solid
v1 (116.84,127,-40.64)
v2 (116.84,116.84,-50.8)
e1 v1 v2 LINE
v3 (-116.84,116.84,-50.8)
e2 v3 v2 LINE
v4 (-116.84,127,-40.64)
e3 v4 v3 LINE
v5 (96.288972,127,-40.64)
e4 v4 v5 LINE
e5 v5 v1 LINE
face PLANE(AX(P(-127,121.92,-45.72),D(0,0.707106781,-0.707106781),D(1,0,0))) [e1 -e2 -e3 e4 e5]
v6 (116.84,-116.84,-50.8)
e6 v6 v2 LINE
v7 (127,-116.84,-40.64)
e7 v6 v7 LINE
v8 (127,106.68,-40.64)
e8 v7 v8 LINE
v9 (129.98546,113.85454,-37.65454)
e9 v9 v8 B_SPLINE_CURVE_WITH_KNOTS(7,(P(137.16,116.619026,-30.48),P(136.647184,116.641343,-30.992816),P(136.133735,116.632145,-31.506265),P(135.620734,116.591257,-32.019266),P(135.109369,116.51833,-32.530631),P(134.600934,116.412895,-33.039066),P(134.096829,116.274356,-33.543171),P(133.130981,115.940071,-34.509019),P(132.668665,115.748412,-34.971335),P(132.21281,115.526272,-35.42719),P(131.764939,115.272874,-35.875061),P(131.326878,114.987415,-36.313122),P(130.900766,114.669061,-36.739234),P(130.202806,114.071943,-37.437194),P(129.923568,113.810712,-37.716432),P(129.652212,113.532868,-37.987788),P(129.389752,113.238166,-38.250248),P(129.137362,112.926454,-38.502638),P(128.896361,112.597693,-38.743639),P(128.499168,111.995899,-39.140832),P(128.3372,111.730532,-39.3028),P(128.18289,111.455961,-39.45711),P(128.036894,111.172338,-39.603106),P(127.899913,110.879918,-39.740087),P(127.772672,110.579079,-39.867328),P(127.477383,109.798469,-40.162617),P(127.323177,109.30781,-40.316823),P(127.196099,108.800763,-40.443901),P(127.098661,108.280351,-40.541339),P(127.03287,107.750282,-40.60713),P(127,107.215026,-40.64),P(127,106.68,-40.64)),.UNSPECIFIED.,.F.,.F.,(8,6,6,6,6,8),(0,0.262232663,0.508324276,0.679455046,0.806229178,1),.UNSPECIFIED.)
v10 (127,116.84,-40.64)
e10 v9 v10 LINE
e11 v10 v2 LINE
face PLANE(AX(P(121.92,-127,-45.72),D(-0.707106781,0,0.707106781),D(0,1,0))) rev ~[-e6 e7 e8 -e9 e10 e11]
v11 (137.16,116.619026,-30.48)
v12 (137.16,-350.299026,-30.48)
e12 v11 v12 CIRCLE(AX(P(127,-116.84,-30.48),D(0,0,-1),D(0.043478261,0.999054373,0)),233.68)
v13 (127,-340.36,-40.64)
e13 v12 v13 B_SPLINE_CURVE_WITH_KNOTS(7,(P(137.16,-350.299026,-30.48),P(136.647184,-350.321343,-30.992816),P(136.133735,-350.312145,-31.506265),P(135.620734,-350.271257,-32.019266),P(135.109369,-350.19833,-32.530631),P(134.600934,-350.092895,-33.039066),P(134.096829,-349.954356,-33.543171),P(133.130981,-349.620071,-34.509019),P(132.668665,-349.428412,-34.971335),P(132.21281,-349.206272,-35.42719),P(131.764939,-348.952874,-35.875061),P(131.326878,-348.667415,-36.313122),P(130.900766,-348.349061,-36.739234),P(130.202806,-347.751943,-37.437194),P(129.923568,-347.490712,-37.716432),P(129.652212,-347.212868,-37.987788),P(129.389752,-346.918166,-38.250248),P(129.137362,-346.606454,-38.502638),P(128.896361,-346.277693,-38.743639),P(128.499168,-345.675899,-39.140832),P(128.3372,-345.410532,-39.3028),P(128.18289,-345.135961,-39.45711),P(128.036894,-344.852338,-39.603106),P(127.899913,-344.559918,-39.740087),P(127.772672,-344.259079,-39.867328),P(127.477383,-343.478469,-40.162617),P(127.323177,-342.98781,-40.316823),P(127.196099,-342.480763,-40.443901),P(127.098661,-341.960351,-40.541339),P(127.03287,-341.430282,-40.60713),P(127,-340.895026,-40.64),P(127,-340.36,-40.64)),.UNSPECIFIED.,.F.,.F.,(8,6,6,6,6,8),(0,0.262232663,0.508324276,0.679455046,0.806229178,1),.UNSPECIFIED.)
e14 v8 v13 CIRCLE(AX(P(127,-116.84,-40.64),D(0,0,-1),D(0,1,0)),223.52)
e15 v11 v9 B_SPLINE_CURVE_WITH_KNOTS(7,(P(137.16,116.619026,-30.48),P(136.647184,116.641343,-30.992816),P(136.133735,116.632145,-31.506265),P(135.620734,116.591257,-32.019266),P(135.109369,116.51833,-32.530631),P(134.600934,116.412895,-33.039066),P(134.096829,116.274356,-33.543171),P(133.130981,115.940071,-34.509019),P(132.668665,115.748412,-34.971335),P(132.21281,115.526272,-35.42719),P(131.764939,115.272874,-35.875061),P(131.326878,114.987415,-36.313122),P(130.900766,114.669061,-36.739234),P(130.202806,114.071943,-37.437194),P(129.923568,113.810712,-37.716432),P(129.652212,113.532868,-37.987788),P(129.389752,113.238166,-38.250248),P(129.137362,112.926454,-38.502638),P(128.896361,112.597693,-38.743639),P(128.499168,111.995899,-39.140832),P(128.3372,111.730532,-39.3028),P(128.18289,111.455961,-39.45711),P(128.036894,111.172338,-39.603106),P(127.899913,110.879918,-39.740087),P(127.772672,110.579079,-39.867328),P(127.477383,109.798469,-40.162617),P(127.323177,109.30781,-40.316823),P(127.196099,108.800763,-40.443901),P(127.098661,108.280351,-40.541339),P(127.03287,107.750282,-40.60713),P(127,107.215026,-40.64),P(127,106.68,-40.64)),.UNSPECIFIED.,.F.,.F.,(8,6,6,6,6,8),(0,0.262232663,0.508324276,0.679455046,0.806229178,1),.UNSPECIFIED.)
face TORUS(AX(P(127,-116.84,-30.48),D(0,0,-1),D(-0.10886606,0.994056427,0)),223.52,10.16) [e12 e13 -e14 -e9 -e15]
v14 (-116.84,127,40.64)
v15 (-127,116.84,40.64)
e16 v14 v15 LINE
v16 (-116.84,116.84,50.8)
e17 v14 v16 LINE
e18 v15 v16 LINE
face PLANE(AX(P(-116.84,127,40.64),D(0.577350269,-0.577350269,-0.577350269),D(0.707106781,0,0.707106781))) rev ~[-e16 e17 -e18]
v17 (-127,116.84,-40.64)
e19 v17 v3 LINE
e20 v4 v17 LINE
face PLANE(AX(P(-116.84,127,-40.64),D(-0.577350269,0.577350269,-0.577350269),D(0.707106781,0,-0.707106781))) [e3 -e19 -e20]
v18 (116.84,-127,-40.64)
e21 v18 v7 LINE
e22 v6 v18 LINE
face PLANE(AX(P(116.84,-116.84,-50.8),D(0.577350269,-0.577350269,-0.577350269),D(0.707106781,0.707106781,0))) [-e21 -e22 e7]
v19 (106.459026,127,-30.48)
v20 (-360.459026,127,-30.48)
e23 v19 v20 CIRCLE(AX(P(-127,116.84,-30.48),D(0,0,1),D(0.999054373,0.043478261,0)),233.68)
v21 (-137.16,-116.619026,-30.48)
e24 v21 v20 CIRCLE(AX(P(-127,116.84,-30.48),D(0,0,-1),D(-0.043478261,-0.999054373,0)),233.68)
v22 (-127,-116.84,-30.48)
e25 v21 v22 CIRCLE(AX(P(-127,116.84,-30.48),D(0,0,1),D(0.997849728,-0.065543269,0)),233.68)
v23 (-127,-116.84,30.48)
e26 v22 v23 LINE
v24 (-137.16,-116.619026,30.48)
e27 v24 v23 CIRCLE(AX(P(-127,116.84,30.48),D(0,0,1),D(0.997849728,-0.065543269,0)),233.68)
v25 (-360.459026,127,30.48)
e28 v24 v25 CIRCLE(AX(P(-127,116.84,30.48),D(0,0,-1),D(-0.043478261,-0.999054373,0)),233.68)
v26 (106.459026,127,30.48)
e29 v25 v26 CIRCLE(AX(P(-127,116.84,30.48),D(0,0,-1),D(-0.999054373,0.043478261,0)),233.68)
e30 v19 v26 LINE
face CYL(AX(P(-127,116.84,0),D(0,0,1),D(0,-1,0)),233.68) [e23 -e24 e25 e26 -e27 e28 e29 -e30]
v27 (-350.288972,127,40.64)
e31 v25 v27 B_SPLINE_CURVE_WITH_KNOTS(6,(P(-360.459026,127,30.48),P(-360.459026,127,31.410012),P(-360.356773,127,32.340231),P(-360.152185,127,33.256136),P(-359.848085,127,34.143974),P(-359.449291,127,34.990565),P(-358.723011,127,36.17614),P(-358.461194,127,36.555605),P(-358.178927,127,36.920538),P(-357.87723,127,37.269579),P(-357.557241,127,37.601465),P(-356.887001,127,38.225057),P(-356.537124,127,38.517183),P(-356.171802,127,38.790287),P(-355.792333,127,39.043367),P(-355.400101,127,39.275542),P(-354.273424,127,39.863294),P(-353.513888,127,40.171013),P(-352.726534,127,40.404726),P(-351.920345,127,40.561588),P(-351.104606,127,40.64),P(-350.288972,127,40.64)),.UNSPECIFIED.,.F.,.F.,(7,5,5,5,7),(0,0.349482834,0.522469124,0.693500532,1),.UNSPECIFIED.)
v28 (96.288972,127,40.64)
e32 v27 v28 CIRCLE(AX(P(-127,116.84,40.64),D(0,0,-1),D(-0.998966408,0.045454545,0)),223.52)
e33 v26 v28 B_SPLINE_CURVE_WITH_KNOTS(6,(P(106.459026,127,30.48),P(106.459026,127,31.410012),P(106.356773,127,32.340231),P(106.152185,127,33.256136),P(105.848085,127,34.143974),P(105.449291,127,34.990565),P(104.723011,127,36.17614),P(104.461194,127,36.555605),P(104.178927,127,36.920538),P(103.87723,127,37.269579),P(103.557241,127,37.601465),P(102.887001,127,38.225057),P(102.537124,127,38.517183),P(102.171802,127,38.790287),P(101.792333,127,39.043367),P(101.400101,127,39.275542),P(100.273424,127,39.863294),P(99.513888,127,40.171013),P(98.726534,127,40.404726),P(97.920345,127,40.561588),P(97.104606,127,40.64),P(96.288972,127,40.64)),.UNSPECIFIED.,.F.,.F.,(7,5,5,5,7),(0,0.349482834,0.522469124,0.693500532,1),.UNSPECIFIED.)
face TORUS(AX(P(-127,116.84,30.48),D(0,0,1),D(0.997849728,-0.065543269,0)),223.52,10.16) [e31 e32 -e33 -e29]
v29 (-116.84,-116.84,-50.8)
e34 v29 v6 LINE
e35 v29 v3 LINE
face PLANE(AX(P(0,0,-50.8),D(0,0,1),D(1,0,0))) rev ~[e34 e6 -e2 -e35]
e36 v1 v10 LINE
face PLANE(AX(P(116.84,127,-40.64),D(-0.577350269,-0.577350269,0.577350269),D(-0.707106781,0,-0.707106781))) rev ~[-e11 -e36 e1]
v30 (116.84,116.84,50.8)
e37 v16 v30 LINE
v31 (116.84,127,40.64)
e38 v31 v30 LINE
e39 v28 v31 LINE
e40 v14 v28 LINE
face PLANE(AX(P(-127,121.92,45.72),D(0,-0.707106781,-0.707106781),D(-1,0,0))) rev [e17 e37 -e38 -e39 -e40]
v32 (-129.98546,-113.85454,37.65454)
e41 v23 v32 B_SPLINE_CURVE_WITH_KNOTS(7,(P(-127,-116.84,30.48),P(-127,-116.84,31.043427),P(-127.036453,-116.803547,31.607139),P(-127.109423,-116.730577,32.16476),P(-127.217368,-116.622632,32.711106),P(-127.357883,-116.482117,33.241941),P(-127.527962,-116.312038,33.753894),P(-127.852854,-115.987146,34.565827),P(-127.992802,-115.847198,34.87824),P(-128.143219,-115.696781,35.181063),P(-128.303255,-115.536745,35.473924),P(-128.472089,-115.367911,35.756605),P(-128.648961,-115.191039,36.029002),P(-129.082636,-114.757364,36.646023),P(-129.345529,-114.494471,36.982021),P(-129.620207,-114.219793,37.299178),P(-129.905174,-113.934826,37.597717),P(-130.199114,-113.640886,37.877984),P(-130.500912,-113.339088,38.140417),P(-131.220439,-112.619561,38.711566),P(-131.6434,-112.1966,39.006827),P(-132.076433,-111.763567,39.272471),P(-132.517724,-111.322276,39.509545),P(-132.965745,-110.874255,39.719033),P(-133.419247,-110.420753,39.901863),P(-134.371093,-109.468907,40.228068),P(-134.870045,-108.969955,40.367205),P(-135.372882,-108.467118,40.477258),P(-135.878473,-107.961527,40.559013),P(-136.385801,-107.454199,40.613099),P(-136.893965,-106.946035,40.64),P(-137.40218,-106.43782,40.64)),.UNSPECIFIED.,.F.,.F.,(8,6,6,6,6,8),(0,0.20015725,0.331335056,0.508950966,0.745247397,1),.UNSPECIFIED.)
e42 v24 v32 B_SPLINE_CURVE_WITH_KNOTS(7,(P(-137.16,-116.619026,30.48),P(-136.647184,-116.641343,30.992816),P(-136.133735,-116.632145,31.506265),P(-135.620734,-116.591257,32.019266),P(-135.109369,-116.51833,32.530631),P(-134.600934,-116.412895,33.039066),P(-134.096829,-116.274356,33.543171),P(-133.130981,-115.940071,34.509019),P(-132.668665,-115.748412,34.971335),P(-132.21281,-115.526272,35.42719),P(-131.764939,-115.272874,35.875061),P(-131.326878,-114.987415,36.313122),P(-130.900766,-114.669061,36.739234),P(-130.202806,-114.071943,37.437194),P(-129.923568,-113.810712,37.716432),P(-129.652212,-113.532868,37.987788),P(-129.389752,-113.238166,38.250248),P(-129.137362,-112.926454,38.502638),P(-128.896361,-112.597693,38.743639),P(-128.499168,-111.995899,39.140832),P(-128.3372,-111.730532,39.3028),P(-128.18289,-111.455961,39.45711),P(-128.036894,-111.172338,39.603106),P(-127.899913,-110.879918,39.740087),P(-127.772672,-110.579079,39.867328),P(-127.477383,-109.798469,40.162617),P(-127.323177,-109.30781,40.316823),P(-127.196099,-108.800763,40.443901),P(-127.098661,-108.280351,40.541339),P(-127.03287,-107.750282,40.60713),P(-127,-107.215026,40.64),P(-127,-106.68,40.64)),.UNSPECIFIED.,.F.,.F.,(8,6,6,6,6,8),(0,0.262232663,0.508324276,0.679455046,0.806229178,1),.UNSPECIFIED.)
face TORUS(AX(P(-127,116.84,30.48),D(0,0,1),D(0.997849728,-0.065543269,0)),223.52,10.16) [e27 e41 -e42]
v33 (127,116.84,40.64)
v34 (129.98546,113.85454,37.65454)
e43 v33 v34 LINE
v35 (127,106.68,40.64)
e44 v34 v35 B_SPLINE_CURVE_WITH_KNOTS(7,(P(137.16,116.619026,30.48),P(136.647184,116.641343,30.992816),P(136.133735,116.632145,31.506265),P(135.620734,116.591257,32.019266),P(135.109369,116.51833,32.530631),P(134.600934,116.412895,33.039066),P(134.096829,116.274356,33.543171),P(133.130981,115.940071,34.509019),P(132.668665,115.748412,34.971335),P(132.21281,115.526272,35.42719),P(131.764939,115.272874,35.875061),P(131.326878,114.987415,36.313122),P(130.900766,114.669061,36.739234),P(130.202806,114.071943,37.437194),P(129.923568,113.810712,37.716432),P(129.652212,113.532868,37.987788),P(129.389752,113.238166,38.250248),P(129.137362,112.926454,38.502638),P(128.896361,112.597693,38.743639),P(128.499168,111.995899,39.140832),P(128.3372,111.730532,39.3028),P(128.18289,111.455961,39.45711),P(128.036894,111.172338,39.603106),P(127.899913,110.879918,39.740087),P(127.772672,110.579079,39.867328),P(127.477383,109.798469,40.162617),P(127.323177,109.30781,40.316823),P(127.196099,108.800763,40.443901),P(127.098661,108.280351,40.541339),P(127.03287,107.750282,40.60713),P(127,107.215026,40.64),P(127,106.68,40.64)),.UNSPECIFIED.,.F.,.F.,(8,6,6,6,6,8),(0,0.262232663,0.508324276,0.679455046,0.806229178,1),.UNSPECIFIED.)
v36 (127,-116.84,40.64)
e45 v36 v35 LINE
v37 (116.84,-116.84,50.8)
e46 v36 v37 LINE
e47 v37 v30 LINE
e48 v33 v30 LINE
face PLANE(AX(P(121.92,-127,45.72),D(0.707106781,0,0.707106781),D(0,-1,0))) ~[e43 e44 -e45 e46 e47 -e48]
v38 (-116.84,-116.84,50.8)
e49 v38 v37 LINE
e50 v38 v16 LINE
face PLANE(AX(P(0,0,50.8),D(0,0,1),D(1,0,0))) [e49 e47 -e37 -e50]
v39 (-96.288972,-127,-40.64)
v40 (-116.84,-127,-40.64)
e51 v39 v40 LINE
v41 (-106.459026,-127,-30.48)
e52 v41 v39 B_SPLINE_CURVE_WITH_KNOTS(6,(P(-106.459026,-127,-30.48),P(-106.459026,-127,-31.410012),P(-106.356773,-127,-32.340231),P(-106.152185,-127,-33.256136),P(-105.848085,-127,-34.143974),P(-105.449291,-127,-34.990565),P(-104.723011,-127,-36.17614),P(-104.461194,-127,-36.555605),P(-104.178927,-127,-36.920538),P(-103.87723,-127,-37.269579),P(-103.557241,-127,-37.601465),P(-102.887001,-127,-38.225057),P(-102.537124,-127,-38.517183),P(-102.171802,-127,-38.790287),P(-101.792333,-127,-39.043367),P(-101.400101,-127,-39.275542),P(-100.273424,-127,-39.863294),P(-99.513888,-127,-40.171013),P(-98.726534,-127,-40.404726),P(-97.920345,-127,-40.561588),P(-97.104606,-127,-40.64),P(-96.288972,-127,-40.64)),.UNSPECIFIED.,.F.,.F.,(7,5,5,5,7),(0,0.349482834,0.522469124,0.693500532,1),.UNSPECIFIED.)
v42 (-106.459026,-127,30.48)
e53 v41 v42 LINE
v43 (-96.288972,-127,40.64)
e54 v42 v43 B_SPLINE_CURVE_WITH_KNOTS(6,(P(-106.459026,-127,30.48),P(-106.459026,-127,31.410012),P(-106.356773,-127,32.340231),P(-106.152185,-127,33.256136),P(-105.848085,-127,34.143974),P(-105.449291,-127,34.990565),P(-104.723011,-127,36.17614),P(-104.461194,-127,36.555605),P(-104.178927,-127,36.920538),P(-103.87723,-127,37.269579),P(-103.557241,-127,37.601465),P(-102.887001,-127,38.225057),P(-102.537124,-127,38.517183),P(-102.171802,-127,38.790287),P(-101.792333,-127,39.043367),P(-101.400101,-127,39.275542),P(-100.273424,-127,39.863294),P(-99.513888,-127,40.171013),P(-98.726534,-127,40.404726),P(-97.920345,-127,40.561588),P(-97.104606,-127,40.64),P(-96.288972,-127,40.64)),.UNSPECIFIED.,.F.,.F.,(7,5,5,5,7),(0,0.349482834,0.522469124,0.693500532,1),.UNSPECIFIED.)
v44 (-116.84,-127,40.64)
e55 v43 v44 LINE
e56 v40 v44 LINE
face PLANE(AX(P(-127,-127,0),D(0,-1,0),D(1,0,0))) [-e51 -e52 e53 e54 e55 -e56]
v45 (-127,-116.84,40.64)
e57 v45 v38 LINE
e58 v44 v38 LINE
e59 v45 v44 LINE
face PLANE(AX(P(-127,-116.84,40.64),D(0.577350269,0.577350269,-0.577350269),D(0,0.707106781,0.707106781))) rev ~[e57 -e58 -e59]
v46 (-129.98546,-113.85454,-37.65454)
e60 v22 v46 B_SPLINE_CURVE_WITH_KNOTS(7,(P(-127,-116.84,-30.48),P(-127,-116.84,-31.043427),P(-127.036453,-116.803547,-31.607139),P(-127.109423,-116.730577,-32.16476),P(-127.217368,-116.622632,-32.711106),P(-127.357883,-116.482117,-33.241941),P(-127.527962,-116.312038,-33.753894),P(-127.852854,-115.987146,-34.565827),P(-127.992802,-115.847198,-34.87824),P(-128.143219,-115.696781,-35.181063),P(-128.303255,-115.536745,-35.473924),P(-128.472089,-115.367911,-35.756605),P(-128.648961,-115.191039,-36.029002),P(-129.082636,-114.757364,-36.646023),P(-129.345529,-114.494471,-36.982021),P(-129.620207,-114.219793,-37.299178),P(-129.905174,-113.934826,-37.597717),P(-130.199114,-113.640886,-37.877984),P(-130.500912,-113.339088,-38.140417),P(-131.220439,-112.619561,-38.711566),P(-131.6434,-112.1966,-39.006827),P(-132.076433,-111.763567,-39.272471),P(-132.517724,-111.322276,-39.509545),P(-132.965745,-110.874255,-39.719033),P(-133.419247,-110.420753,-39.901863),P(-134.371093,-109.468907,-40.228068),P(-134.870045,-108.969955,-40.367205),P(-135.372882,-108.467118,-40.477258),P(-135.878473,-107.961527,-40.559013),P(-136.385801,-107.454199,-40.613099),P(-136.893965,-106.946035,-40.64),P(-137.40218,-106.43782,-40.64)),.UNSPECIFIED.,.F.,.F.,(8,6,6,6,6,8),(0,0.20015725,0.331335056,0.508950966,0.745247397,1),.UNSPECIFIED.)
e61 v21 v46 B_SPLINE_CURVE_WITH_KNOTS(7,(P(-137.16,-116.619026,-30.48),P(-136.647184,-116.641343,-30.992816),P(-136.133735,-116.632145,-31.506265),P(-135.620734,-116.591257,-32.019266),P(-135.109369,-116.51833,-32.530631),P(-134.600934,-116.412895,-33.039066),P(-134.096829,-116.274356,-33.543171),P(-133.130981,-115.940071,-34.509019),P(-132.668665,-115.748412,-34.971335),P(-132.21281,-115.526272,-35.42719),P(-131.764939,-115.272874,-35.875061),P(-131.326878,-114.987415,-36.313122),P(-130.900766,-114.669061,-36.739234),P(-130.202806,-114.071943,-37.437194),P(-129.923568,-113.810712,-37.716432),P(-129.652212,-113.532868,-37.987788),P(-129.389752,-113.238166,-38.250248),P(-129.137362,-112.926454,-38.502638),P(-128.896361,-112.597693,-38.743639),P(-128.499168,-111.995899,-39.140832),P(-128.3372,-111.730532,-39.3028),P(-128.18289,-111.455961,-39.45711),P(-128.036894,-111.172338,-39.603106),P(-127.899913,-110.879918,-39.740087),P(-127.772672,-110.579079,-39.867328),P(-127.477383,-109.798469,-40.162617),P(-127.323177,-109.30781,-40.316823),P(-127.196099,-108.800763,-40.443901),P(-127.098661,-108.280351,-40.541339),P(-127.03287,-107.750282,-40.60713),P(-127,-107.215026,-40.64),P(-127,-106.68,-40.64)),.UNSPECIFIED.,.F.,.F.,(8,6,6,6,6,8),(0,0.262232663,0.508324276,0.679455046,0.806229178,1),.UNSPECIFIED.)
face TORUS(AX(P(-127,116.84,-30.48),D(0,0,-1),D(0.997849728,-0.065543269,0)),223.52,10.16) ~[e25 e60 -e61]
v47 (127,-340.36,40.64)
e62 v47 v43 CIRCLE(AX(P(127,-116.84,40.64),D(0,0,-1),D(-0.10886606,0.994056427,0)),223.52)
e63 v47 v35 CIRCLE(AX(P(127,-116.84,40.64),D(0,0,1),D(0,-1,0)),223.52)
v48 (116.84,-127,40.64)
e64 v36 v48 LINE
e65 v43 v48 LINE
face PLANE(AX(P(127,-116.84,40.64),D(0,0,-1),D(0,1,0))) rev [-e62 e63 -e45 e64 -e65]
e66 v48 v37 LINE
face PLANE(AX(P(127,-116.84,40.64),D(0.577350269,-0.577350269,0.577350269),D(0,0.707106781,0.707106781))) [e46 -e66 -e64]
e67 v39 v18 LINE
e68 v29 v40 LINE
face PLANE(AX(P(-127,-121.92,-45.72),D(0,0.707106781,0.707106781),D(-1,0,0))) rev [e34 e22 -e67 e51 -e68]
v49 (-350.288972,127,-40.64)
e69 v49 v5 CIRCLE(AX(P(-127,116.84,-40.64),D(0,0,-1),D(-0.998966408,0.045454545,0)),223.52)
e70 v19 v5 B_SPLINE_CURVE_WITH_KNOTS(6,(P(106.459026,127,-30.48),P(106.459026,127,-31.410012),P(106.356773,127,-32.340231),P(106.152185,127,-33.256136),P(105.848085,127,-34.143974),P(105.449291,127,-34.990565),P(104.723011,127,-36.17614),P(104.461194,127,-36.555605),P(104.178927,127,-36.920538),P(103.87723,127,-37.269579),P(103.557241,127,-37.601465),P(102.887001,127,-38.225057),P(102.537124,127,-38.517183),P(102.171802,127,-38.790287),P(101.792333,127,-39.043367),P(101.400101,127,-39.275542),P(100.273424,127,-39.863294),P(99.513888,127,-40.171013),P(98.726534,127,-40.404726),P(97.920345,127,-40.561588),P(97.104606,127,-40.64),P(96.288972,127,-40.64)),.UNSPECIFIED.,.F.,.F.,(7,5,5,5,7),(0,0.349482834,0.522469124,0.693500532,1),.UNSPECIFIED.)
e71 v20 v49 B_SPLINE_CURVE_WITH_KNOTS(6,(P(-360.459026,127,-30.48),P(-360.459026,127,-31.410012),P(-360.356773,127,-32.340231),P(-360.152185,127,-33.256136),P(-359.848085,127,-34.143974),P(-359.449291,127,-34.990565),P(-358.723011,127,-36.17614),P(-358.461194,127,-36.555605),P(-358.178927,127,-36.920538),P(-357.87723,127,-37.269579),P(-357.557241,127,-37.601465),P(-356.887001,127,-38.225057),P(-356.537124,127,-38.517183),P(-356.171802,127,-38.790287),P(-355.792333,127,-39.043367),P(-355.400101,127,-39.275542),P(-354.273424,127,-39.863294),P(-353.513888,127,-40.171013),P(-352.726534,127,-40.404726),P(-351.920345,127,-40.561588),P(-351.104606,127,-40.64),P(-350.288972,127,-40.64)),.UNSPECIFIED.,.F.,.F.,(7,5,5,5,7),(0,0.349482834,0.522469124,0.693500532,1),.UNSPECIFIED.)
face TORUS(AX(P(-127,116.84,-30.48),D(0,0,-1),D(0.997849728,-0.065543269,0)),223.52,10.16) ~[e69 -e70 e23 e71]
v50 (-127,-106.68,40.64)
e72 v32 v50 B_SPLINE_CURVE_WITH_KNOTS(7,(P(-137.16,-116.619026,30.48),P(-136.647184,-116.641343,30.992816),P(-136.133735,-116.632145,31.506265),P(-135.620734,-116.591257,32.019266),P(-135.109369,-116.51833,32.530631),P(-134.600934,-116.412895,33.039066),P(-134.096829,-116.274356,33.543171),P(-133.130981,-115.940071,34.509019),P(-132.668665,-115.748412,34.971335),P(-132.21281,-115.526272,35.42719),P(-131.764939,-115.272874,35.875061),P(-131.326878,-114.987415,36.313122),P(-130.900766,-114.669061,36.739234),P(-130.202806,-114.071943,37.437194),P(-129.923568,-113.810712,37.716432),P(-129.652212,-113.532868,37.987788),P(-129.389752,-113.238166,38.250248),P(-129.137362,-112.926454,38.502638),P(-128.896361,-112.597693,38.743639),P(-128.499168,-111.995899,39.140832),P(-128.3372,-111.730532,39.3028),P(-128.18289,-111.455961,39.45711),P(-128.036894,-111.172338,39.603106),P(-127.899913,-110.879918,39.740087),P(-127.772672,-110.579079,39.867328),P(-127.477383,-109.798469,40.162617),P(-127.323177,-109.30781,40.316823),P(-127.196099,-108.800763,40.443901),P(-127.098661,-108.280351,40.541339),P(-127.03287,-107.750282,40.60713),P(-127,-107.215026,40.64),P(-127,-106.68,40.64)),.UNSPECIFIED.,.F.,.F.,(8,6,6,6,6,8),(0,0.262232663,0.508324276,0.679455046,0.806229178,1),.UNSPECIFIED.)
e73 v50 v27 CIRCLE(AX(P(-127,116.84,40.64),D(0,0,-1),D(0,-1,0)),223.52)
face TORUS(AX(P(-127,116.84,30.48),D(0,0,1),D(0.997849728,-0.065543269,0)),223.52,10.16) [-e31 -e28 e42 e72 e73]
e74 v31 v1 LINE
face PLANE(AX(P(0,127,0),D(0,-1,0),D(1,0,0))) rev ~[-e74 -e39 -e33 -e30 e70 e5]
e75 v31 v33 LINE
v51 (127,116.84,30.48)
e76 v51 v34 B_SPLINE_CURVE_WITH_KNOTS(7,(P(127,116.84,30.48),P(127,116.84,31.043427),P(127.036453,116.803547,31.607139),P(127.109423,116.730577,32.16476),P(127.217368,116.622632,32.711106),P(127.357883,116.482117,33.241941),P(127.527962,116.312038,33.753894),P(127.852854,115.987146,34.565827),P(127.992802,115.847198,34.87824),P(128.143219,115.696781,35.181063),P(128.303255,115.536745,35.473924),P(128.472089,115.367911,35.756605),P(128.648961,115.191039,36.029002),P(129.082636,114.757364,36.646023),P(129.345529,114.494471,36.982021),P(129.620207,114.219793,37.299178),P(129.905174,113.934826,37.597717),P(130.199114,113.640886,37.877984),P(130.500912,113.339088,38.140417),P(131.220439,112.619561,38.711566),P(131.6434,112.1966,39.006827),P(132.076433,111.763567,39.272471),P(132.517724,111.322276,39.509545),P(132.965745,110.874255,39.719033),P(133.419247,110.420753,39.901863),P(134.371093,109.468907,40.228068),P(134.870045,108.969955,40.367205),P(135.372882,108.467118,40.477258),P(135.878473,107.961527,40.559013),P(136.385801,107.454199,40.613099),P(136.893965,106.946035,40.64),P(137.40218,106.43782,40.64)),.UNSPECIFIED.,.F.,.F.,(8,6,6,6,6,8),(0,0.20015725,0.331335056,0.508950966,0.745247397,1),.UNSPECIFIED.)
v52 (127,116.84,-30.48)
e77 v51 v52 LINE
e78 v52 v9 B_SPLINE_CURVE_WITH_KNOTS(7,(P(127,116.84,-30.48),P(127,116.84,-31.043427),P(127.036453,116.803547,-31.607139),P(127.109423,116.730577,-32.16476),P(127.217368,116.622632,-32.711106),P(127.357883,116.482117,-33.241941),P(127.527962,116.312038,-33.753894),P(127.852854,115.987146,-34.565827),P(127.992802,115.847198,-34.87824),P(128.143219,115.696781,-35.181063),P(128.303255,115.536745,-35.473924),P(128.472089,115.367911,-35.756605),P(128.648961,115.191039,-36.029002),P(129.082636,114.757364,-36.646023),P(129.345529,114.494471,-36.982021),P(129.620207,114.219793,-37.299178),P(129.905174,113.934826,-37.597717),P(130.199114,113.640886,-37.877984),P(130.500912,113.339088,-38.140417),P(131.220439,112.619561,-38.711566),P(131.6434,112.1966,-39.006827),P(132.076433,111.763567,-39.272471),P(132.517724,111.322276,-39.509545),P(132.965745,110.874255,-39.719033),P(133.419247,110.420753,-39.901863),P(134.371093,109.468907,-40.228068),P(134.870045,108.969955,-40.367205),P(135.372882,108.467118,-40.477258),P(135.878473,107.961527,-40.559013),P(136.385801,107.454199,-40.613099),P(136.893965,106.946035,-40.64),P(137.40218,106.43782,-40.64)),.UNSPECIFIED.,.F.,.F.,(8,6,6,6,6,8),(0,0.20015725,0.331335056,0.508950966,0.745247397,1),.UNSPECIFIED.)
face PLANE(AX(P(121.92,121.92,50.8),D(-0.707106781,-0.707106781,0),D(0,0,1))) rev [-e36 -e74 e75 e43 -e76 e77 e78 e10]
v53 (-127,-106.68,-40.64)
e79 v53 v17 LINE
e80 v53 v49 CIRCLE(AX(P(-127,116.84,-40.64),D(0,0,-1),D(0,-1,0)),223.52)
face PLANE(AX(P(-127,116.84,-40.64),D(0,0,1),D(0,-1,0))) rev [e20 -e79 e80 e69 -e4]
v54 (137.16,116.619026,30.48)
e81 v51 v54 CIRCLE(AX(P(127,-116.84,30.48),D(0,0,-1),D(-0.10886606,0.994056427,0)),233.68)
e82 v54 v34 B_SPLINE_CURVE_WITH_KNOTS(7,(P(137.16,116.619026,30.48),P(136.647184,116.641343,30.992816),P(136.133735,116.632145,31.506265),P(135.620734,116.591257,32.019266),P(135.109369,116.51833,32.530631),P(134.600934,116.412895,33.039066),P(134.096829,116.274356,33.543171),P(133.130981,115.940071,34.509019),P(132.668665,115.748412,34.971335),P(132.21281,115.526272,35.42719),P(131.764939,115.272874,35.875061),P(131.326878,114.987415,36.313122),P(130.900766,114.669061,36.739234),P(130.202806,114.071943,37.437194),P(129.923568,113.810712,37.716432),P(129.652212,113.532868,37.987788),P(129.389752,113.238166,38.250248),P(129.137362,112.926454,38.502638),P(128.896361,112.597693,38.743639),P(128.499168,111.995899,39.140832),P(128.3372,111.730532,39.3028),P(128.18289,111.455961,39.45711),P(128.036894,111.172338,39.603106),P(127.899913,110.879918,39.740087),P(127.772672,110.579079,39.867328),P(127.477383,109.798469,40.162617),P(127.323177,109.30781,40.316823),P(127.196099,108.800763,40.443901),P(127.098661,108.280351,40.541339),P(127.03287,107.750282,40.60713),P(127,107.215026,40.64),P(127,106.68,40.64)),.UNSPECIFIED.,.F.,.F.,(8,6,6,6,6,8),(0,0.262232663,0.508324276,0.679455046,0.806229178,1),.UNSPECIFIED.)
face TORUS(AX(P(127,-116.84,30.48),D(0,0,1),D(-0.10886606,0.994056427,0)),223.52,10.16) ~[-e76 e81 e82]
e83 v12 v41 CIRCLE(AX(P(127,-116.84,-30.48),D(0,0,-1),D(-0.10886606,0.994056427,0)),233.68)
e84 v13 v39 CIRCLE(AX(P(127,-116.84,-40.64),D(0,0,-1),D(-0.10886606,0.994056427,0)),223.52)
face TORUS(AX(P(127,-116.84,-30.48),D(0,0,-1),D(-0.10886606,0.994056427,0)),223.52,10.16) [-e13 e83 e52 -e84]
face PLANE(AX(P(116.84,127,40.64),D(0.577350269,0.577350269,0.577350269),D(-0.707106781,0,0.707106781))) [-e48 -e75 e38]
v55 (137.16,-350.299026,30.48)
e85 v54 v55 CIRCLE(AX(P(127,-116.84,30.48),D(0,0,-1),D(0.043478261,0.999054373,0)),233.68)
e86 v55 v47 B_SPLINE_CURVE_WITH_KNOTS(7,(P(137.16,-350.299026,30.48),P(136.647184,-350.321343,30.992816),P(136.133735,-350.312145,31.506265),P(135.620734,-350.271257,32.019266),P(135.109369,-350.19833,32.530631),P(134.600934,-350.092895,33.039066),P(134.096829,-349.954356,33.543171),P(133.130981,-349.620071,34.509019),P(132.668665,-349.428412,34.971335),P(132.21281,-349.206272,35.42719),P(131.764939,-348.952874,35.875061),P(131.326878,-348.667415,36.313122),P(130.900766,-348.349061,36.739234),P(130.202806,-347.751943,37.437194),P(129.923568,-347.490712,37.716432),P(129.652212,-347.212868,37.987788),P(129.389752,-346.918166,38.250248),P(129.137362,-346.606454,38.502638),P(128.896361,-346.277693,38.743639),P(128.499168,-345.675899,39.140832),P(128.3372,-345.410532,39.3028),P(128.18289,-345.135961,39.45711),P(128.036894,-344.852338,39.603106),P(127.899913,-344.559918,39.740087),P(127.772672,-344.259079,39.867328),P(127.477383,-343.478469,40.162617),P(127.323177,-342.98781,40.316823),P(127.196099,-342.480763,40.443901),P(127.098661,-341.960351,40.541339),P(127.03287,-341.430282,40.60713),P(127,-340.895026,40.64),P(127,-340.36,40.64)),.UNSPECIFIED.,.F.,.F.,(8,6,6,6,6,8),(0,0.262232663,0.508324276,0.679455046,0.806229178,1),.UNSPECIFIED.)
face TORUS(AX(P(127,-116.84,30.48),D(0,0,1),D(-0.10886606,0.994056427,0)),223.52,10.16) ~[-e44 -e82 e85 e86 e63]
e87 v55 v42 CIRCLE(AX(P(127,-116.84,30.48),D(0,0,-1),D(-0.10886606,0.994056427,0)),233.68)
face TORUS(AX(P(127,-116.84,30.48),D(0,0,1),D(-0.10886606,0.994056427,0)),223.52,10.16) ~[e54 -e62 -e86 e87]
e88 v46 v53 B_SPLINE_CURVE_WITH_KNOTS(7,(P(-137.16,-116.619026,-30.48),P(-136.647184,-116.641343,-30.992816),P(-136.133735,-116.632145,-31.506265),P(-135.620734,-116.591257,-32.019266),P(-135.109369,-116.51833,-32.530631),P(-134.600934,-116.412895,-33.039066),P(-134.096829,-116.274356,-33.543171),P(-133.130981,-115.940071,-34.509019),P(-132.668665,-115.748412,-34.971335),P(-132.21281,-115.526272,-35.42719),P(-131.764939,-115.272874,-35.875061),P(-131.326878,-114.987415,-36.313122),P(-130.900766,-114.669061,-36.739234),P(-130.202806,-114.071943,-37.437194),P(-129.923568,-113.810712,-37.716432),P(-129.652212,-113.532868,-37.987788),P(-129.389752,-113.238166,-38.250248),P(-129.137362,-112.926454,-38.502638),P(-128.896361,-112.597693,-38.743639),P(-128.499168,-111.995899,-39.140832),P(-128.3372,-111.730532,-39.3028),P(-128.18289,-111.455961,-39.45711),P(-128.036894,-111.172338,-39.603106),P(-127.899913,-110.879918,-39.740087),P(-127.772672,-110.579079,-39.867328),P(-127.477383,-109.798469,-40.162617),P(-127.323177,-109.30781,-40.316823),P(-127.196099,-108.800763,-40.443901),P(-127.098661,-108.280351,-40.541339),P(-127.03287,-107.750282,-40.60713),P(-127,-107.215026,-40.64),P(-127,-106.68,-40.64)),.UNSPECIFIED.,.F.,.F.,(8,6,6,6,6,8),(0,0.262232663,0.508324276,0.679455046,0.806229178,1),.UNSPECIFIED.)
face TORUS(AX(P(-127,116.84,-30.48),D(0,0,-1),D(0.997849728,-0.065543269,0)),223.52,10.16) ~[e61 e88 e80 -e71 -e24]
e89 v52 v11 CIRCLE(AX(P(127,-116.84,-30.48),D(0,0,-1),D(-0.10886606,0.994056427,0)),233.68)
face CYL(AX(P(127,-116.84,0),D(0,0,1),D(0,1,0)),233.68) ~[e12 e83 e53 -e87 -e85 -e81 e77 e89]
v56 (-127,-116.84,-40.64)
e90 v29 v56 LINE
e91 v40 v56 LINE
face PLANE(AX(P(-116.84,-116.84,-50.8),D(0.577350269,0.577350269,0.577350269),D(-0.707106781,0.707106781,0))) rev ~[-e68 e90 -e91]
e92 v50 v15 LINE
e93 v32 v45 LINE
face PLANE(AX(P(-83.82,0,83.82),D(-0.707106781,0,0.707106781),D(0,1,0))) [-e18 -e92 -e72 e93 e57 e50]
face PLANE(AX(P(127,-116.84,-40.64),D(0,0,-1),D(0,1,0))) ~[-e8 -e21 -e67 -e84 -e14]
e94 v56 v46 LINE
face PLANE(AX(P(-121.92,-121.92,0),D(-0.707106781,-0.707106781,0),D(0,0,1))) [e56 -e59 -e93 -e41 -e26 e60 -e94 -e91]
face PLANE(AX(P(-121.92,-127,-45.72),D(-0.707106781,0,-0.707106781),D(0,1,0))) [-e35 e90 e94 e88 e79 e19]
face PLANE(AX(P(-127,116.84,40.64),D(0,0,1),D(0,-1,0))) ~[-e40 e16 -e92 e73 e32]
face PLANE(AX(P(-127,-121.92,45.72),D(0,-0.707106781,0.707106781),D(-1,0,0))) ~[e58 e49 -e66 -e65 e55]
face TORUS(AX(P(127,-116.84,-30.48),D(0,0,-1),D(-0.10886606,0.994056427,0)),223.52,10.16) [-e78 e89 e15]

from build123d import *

# Parameters (mm, degrees)
F0_W          = 254
F0_H          = 254
F1_DEPTH      = 50.8
F1_DEPTH_BACK = 50.8
F2_SIZE       = 10.16
F1_FACE_W     = 233.68
F1_FACE_H     = 81.28
F1_FACE1_W    = 233.68
F1_FACE1_H    = 81.28
F5_T4_ANGLE   = 280.0079997231
F5_T9_ANGLE   = 280.0079997231
F5_T14_ANGLE  = 280.0079997231
F5_T19_ANGLE  = 280.0079997231
F5_T24_ANGLE  = 280.0079997231
F5_T29_ANGLE  = 280.0079997231
F5_T34_ANGLE  = 280.0079997231
F5_T39_ANGLE  = 280.0079997231
F5_T44_ANGLE  = 280.0079997231
F5_T49_ANGLE  = 280.0079997231
F5_T54_ANGLE  = 280.0079997231
F5_T59_ANGLE  = 280.0079997231


# Not quite as in the source:
# - a fillet or chamfer that OpenCascade refuses, or shapes differently, is made with other operations: its cross-section is extruded or revolved along the edge and cut away or added


with BuildPart() as f1:
    # F0 (on Top) → F1 (new body, two sides)
    with BuildSketch(Plane.XY) as f1_sk:
        Rectangle(F0_W, F0_H)
    extrude(amount=F1_DEPTH)
    extrude(f1_sk.sketch, amount=-F1_DEPTH_BACK)

    # F2
    f2_edges = [f1.edges().sort_by_distance(p)[0] for p in [
        (0, -127, 50.8),
        (127, -127, 0),
        (127, 0, 50.8),
        (-127, -127, 0),
        (0, -127, -50.8),
        (127, 0, -50.8),
        (127, 127, 0),
        (-127, 0, 50.8),
        (-127, 0, -50.8),
        (-127, 127, 0),
        (0, 127, 50.8),
        (0, 127, -50.8),
    ]]
    chamfer(f2_edges, length=F2_SIZE)

    # F1_face (on face) → F3 (revolve)
    with BuildSketch(Plane.YZ.offset(127)):
        Rectangle(F1_FACE_W, F1_FACE_H)
    revolve(axis=Axis((127, -116.84, 0), (0, 0, -1)))

    # F1_face1 (on face) → F4 (revolve)
    with BuildSketch(Plane(origin=(-127, 0, 0), x_dir=(0, -1, 0), z_dir=(-1, 0, 0))):
        Rectangle(F1_FACE1_W, F1_FACE1_H)
    revolve(axis=Axis((-127, 116.84, 0), (0, 0, 1)))

    # F5: fillet of radius 10.16 on 4 edges, made by hand


with BuildPart() as f5_tool2:
    # F5_s3 → F5_t4 (revolve)
    with BuildSketch(Plane(origin=(112.850510213, 12.3590473355, 0), x_dir=(0, 0, 1), z_dir=(-0.9940564274, -0.1088660602, 0))):
        with BuildLine():
            ThreePointArc((30.48, 103.70845737), (37.6642048969, 100.7326622668), (40.64, 93.54845737))
            Line((40.64, 93.54845737), (40.64, 103.70845737))
            Line((40.64, 103.70845737), (30.48, 103.70845737))
        make_face()
    revolve(axis=Axis((127, -116.84, 40.64), (0, 0, -1)), revolution_arc=F5_T4_ANGLE)

    split(bisect_by=Plane(origin=(83.82, 0, 83.82), x_dir=(0, 1, 0), z_dir=(0.7071067812, 0, 0.7071067812)), keep=Keep.TOP)


with BuildPart() as f1_1:
    add(f1.part)

    # F5_t1: cut F5_tool2
    add(f5_tool2.part, mode=Mode.SUBTRACT)


with BuildPart() as f5_tool7:
    # F5_s8 → F5_t9 (revolve)
    with BuildSketch(Plane(origin=(112.850510213, 12.3590473355, 0), x_dir=(0, 0, 1), z_dir=(-0.9940564274, -0.1088660602, 0))):
        with BuildLine():
            ThreePointArc((30.48, 103.70845737), (37.6642048969, 100.7326622668), (40.64, 93.54845737))
            Line((40.64, 93.54845737), (40.64, 103.70845737))
            Line((40.64, 103.70845737), (30.48, 103.70845737))
        make_face()
    revolve(axis=Axis((127, -116.84, 40.64), (0, 0, -1)), revolution_arc=F5_T9_ANGLE)

    split(bisect_by=Plane(origin=(121.92, 121.92, 0), x_dir=(0, 0, 1), z_dir=(0.7071067812, 0.7071067812, 0)), keep=Keep.TOP)


with BuildPart() as f1_2:
    add(f1_1.part)

    # F5_t6: cut F5_tool7
    add(f5_tool7.part, mode=Mode.SUBTRACT)


with BuildPart() as f5_tool12:
    # F5_s13 → F5_t14 (revolve)
    with BuildSketch(Plane(origin=(112.850510213, 12.3590473355, 0), x_dir=(0, 0, 1), z_dir=(-0.9940564274, -0.1088660602, 0))):
        with BuildLine():
            ThreePointArc((30.48, 103.70845737), (37.6642048969, 100.7326622668), (40.64, 93.54845737))
            Line((40.64, 93.54845737), (40.64, 103.70845737))
            Line((40.64, 103.70845737), (30.48, 103.70845737))
        make_face()
    revolve(axis=Axis((127, -116.84, 40.64), (0, 0, -1)), revolution_arc=F5_T14_ANGLE)

    split(bisect_by=Plane.XZ.offset(127), keep=Keep.TOP)


with BuildPart() as f1_3:
    add(f1_2.part)

    # F5_t11: cut F5_tool12
    add(f5_tool12.part, mode=Mode.SUBTRACT)


with BuildPart() as f5_tool17:
    # F5_s18 → F5_t19 (revolve)
    with BuildSketch(Plane(origin=(112.850510213, 12.3590473355, 0), x_dir=(0, 0, 1), z_dir=(-0.9940564274, -0.1088660602, 0))):
        with BuildLine():
            ThreePointArc((-30.48, 103.70845737), (-37.6642048969, 100.7326622668), (-40.64, 93.54845737))
            Line((-40.64, 93.54845737), (-40.64, 103.70845737))
            Line((-40.64, 103.70845737), (-30.48, 103.70845737))
        make_face()
    revolve(axis=Axis((127, -116.84, -40.64), (0, 0, -1)), revolution_arc=F5_T19_ANGLE)

    split(bisect_by=Plane(origin=(83.82, 0, -83.82), x_dir=(0, 1, 0), z_dir=(0.7071067812, 0, -0.7071067812)), keep=Keep.TOP)


with BuildPart() as f1_4:
    add(f1_3.part)

    # F5_t16: cut F5_tool17
    add(f5_tool17.part, mode=Mode.SUBTRACT)


with BuildPart() as f5_tool22:
    # F5_s23 → F5_t24 (revolve)
    with BuildSketch(Plane(origin=(112.850510213, 12.3590473355, 0), x_dir=(0, 0, 1), z_dir=(-0.9940564274, -0.1088660602, 0))):
        with BuildLine():
            ThreePointArc((-30.48, 103.70845737), (-37.6642048969, 100.7326622668), (-40.64, 93.54845737))
            Line((-40.64, 93.54845737), (-40.64, 103.70845737))
            Line((-40.64, 103.70845737), (-30.48, 103.70845737))
        make_face()
    revolve(axis=Axis((127, -116.84, -40.64), (0, 0, -1)), revolution_arc=F5_T24_ANGLE)

    split(bisect_by=Plane(origin=(121.92, 121.92, 0), x_dir=(0, 0, 1), z_dir=(0.7071067812, 0.7071067812, 0)), keep=Keep.TOP)


with BuildPart() as f1_5:
    add(f1_4.part)

    # F5_t21: cut F5_tool22
    add(f5_tool22.part, mode=Mode.SUBTRACT)


with BuildPart() as f5_tool27:
    # F5_s28 → F5_t29 (revolve)
    with BuildSketch(Plane(origin=(112.850510213, 12.3590473355, 0), x_dir=(0, 0, 1), z_dir=(-0.9940564274, -0.1088660602, 0))):
        with BuildLine():
            ThreePointArc((-30.48, 103.70845737), (-37.6642048969, 100.7326622668), (-40.64, 93.54845737))
            Line((-40.64, 93.54845737), (-40.64, 103.70845737))
            Line((-40.64, 103.70845737), (-30.48, 103.70845737))
        make_face()
    revolve(axis=Axis((127, -116.84, -40.64), (0, 0, -1)), revolution_arc=F5_T29_ANGLE)

    split(bisect_by=Plane.XZ.offset(127), keep=Keep.TOP)


with BuildPart() as f1_6:
    add(f1_5.part)

    # F5_t26: cut F5_tool27
    add(f5_tool27.part, mode=Mode.SUBTRACT)


with BuildPart() as f5_tool32:
    # F5_s33 → F5_t34 (revolve)
    with BuildSketch(Plane(origin=(7.0960267411, 108.0319683984, 0), x_dir=(0, 0, 1), z_dir=(-0.0655432689, -0.9978497281, 0))):
        with BuildLine():
            ThreePointArc((-30.48, -99.2950089912), (-37.6642048969, -96.319213888), (-40.64, -89.1350089912))
            Line((-40.64, -89.1350089912), (-40.64, -99.2950089912))
            Line((-40.64, -99.2950089912), (-30.48, -99.2950089912))
        make_face()
    revolve(axis=Axis((-127, 116.84, -40.64), (0, 0, 1)), revolution_arc=F5_T34_ANGLE)

    split(bisect_by=Plane.XZ.offset(-127), keep=Keep.BOTTOM)


with BuildPart() as f1_7:
    add(f1_6.part)

    # F5_t31: cut F5_tool32
    add(f5_tool32.part, mode=Mode.SUBTRACT)


with BuildPart() as f5_tool37:
    # F5_s38 → F5_t39 (revolve)
    with BuildSketch(Plane(origin=(7.0960267411, 108.0319683984, 0), x_dir=(0, 0, 1), z_dir=(-0.0655432689, -0.9978497281, 0))):
        with BuildLine():
            ThreePointArc((-30.48, -99.2950089912), (-37.6642048969, -96.319213888), (-40.64, -89.1350089912))
            Line((-40.64, -89.1350089912), (-40.64, -99.2950089912))
            Line((-40.64, -99.2950089912), (-30.48, -99.2950089912))
        make_face()
    revolve(axis=Axis((-127, 116.84, -40.64), (0, 0, 1)), revolution_arc=F5_T39_ANGLE)

    split(bisect_by=Plane(origin=(-83.82, 0, -83.82), x_dir=(0, 1, 0), z_dir=(-0.7071067812, 0, -0.7071067812)), keep=Keep.TOP)


with BuildPart() as f1_8:
    add(f1_7.part)

    # F5_t36: cut F5_tool37
    add(f5_tool37.part, mode=Mode.SUBTRACT)


with BuildPart() as f5_tool42:
    # F5_s43 → F5_t44 (revolve)
    with BuildSketch(Plane(origin=(7.0960267411, 108.0319683984, 0), x_dir=(0, 0, 1), z_dir=(-0.0655432689, -0.9978497281, 0))):
        with BuildLine():
            ThreePointArc((-30.48, -99.2950089912), (-37.6642048969, -96.319213888), (-40.64, -89.1350089912))
            Line((-40.64, -89.1350089912), (-40.64, -99.2950089912))
            Line((-40.64, -99.2950089912), (-30.48, -99.2950089912))
        make_face()
    revolve(axis=Axis((-127, 116.84, -40.64), (0, 0, 1)), revolution_arc=F5_T44_ANGLE)

    split(bisect_by=Plane(origin=(-121.92, -121.92, 0), x_dir=(0, 0, 1), z_dir=(-0.7071067812, -0.7071067812, 0)), keep=Keep.TOP)


with BuildPart() as f1_9:
    add(f1_8.part)

    # F5_t41: cut F5_tool42
    add(f5_tool42.part, mode=Mode.SUBTRACT)


with BuildPart() as f5_tool47:
    # F5_s48 → F5_t49 (revolve)
    with BuildSketch(Plane(origin=(7.0960267411, 108.0319683984, 0), x_dir=(0, 0, 1), z_dir=(-0.0655432689, -0.9978497281, 0))):
        with BuildLine():
            ThreePointArc((30.48, -99.2950089912), (37.6642048969, -96.319213888), (40.64, -89.1350089912))
            Line((40.64, -89.1350089912), (40.64, -99.2950089912))
            Line((40.64, -99.2950089912), (30.48, -99.2950089912))
        make_face()
    revolve(axis=Axis((-127, 116.84, 40.64), (0, 0, 1)), revolution_arc=F5_T49_ANGLE)

    split(bisect_by=Plane.XZ.offset(-127), keep=Keep.BOTTOM)


with BuildPart() as f1_10:
    add(f1_9.part)

    # F5_t46: cut F5_tool47
    add(f5_tool47.part, mode=Mode.SUBTRACT)


with BuildPart() as f5_tool52:
    # F5_s53 → F5_t54 (revolve)
    with BuildSketch(Plane(origin=(7.0960267411, 108.0319683984, 0), x_dir=(0, 0, 1), z_dir=(-0.0655432689, -0.9978497281, 0))):
        with BuildLine():
            ThreePointArc((30.48, -99.2950089912), (37.6642048969, -96.319213888), (40.64, -89.1350089912))
            Line((40.64, -89.1350089912), (40.64, -99.2950089912))
            Line((40.64, -99.2950089912), (30.48, -99.2950089912))
        make_face()
    revolve(axis=Axis((-127, 116.84, 40.64), (0, 0, 1)), revolution_arc=F5_T54_ANGLE)

    split(bisect_by=Plane(origin=(-83.82, 0, 83.82), x_dir=(0, 1, 0), z_dir=(-0.7071067812, 0, 0.7071067812)), keep=Keep.TOP)


with BuildPart() as f1_11:
    add(f1_10.part)

    # F5_t51: cut F5_tool52
    add(f5_tool52.part, mode=Mode.SUBTRACT)


with BuildPart() as f5_tool57:
    # F5_s58 → F5_t59 (revolve)
    with BuildSketch(Plane(origin=(7.0960267411, 108.0319683984, 0), x_dir=(0, 0, 1), z_dir=(-0.0655432689, -0.9978497281, 0))):
        with BuildLine():
            ThreePointArc((30.48, -99.2950089912), (37.6642048969, -96.319213888), (40.64, -89.1350089912))
            Line((40.64, -89.1350089912), (40.64, -99.2950089912))
            Line((40.64, -99.2950089912), (30.48, -99.2950089912))
        make_face()
    revolve(axis=Axis((-127, 116.84, 40.64), (0, 0, 1)), revolution_arc=F5_T59_ANGLE)

    split(bisect_by=Plane(origin=(-121.92, -121.92, 0), x_dir=(0, 0, 1), z_dir=(-0.7071067812, -0.7071067812, 0)), keep=Keep.TOP)


with BuildPart() as f1_12:
    add(f1_11.part)

    # F5_t56: cut F5_tool57
    add(f5_tool57.part, mode=Mode.SUBTRACT)


solid = f1_12.part
